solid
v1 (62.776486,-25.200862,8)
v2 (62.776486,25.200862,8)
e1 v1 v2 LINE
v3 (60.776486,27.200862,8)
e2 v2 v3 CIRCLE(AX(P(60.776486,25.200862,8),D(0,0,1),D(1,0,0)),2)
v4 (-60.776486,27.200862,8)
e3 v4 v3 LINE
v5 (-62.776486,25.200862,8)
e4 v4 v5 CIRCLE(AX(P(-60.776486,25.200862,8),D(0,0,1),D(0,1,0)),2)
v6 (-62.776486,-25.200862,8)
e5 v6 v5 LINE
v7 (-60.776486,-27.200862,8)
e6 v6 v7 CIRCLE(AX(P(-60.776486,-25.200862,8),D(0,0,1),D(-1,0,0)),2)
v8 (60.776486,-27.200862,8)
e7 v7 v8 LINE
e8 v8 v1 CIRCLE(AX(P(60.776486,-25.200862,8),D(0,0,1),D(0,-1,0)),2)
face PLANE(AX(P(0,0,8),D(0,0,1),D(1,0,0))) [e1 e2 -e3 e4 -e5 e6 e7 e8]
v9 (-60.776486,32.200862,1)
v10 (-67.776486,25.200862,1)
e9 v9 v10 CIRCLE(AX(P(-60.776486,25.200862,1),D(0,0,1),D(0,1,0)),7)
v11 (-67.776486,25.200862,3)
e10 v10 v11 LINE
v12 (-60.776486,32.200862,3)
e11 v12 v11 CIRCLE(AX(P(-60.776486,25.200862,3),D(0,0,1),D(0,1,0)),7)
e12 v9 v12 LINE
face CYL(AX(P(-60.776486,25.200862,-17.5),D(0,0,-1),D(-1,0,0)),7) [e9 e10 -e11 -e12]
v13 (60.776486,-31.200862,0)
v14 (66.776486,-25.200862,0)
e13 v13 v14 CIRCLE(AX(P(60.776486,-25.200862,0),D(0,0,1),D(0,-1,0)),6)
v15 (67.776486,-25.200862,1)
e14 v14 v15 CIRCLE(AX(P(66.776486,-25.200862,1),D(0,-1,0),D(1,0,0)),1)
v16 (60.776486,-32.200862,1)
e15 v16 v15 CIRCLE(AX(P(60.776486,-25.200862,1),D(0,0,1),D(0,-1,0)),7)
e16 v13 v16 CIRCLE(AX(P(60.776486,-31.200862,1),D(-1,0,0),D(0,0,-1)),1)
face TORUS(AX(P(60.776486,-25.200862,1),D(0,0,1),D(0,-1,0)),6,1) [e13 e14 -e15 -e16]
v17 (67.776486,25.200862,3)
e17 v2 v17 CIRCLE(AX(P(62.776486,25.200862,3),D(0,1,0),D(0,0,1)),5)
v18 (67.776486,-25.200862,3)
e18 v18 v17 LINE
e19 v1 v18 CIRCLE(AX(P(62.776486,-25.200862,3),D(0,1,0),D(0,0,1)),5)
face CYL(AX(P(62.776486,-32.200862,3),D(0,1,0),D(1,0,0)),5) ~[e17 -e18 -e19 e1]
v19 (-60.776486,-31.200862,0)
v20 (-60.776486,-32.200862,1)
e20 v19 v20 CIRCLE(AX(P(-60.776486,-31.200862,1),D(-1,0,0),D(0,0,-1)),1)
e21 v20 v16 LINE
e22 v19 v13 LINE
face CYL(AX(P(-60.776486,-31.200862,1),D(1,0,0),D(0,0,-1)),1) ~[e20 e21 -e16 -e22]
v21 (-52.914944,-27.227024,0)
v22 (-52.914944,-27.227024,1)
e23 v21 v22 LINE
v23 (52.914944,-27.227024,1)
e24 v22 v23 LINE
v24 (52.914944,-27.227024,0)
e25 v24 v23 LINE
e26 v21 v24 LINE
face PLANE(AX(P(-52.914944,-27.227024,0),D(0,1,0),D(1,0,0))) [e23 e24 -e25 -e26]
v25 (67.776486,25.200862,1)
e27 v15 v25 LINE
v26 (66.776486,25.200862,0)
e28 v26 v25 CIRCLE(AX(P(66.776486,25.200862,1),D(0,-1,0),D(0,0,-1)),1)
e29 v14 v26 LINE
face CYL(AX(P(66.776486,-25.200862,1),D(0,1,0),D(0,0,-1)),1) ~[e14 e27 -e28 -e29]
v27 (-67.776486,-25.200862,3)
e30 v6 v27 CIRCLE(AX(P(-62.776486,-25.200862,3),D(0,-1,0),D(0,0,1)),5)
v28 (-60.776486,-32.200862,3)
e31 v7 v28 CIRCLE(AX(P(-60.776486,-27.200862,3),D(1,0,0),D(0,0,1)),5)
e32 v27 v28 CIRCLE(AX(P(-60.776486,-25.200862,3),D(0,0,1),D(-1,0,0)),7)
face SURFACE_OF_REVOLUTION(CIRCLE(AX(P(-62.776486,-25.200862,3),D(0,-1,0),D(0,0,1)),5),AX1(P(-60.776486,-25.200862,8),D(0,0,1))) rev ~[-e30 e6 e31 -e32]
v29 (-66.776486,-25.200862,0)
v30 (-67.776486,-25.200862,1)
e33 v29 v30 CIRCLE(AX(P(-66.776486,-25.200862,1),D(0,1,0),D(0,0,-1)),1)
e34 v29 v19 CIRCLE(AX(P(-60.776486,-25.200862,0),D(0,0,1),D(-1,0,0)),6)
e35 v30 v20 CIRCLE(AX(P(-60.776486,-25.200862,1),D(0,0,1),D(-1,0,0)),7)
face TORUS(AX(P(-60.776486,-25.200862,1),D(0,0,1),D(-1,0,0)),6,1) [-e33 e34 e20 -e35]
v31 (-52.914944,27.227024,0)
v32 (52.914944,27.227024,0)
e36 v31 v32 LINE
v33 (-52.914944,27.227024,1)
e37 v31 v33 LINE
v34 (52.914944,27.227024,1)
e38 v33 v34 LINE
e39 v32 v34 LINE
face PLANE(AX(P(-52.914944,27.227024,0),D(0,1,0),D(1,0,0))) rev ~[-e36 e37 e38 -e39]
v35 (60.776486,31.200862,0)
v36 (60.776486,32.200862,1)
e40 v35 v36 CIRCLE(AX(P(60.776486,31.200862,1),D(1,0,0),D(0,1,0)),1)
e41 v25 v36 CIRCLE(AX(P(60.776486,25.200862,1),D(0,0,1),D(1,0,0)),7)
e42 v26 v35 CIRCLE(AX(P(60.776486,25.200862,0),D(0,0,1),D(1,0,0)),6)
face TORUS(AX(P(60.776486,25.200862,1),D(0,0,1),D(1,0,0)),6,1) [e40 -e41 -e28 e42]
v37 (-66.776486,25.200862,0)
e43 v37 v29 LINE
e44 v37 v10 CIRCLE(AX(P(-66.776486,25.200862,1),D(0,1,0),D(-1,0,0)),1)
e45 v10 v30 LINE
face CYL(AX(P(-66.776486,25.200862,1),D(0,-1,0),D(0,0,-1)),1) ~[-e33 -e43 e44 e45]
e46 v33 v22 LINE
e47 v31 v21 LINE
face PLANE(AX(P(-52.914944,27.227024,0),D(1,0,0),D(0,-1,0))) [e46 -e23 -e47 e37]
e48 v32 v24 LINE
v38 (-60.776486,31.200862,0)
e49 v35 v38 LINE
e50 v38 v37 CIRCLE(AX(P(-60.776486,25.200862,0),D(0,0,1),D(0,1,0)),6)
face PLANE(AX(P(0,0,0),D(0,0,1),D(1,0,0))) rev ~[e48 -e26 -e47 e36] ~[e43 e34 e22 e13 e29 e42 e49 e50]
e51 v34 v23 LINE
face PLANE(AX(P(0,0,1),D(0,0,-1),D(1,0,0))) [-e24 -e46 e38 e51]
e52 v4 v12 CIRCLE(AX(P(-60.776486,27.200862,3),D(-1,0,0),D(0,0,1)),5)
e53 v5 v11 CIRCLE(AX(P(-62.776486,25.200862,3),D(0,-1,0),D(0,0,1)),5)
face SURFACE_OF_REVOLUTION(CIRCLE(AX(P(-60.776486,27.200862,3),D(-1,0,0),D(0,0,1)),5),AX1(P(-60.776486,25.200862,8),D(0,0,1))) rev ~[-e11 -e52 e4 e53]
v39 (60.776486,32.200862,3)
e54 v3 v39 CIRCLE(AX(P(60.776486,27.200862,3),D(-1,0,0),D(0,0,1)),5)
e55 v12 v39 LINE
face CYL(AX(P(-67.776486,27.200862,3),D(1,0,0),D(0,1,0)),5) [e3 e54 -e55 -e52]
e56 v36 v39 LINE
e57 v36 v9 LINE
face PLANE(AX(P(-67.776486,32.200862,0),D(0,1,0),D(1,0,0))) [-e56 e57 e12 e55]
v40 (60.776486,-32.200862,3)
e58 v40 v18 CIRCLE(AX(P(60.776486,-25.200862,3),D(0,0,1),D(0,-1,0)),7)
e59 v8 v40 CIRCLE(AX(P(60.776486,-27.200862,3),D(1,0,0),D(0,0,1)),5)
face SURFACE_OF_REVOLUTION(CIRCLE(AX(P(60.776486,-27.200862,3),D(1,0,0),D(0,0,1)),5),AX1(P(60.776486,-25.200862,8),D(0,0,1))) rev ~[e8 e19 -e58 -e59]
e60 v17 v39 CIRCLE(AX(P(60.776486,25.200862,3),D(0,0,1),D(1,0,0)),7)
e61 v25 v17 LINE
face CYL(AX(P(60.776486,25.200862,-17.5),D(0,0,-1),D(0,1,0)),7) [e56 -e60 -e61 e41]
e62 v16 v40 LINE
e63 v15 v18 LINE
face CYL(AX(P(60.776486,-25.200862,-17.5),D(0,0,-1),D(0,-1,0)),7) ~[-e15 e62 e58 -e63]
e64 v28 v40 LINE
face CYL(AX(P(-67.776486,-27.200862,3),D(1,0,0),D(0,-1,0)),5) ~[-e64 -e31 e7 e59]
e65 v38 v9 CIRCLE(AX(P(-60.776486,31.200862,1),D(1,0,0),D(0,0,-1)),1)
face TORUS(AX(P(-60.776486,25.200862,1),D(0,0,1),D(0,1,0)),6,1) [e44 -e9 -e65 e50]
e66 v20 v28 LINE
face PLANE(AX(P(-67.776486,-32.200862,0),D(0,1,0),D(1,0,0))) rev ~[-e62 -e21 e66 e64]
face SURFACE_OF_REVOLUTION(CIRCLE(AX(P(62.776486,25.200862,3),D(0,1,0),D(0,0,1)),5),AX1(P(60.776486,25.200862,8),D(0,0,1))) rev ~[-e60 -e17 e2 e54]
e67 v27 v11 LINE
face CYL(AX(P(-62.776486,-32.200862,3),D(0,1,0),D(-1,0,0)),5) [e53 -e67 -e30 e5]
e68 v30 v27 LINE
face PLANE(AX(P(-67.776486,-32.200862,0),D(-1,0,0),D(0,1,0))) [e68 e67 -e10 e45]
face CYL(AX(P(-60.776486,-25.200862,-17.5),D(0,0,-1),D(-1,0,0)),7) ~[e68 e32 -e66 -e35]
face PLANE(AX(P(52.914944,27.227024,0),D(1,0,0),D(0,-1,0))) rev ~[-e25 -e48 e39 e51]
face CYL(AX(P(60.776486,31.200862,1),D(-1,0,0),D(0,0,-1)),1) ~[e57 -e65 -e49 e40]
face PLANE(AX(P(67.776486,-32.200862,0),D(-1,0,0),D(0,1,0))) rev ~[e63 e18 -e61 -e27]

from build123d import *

# Parameters (mm, degrees)
F0_W         = 135.5529725552
F0_H         = 64.4017234445
F1_DEPTH     = 8
F2_R         = 5
F3_T1_DEPTH  = 25.5
F3_T4_ANGLE  = 90
F3_T6_ANGLE  = 90
F3_T8_ANGLE  = 90
F3_T10_ANGLE = 90
F4_R         = 1
F5_W         = 105.8298870921
F5_H         = 54.4540472329
F6_DEPTH     = 1


# Not quite as in the source:
# - a fillet or chamfer that OpenCascade refuses, or shapes differently, is made with other operations: its cross-section is extruded or revolved along the edge and cut away or added


with BuildPart() as f1:
    # F0 (on Top) → F1 (new body)
    with BuildSketch(Plane.XY):
        Rectangle(F0_W, F0_H)
    extrude(amount=F1_DEPTH)

    # F2
    f2_edges = [f1.edges().sort_by_distance(p)[0] for p in [
        (0, 32.200862, 8),
        (-67.776486, 0, 8),
        (0, -32.200862, 8),
        (67.776486, 0, 8),
    ]]
    fillet(f2_edges, radius=F2_R)

    # F3: fillet of radius 7 on 4 edges, made by hand

    # F3_s2 → F3_t1 (cut)
    with BuildSketch(Plane.XY.offset(-17.5)):
        with BuildLine():
            ThreePointArc((-67.7764862776, -25.2008617222), (-65.7262337459, -30.1506091905), (-60.7764862776, -32.2008617222))
            Line((-60.7764862776, -32.2008617222), (-67.7764862776, -32.2008617222))
            Line((-67.7764862776, -32.2008617222), (-67.7764862776, -25.2008617222))
        make_face()
        with BuildLine():
            ThreePointArc((60.7764862776, -32.2008617222), (65.7262337459, -30.1506091905), (67.7764862776, -25.2008617222))
            Line((67.7764862776, -25.2008617222), (67.7764862776, -32.2008617222))
            Line((67.7764862776, -32.2008617222), (60.7764862776, -32.2008617222))
        make_face()
        with BuildLine():
            ThreePointArc((60.7764862776, 32.2008617222), (65.7262337459, 30.1506091905), (67.7764862776, 25.2008617222))
            Line((67.7764862776, 25.2008617222), (67.7764862776, 32.2008617222))
            Line((67.7764862776, 32.2008617222), (60.7764862776, 32.2008617222))
        make_face()
        with BuildLine():
            ThreePointArc((-67.7764862776, 25.2008617222), (-65.7262337459, 30.1506091905), (-60.7764862776, 32.2008617222))
            Line((-60.7764862776, 32.2008617222), (-67.7764862776, 32.2008617222))
            Line((-67.7764862776, 32.2008617222), (-67.7764862776, 25.2008617222))
        make_face()
    extrude(amount=F3_T1_DEPTH, mode=Mode.SUBTRACT)

    # F3_s3 → F3_t4 (revolve, cut)
    with BuildSketch(Plane.YZ.offset(-60.7764862776)):
        with BuildLine():
            ThreePointArc((27.2008617222, 8), (30.7363956282, 6.5355339059), (32.2008617222, 3))
            Line((32.2008617222, 3), (32.2008617222, 8))
            Line((32.2008617222, 8), (27.2008617222, 8))
        make_face()
    revolve(axis=Axis((-60.7764862776, 25.2008617222, 8), (0, 0, 1)), revolution_arc=F3_T4_ANGLE, mode=Mode.SUBTRACT)

    # F3_s5 → F3_t6 (revolve, cut)
    with BuildSketch(Plane.XZ.offset(-25.2008617222)):
        with BuildLine():
            ThreePointArc((62.7764862776, 8), (66.3120201835, 6.5355339059), (67.7764862776, 3))
            Line((67.7764862776, 3), (67.7764862776, 8))
            Line((67.7764862776, 8), (62.7764862776, 8))
        make_face()
    revolve(axis=Axis((60.7764862776, 25.2008617222, 8), (0, 0, 1)), revolution_arc=F3_T6_ANGLE, mode=Mode.SUBTRACT)

    # F3_s7 → F3_t8 (revolve, cut)
    with BuildSketch(Plane.YZ.offset(60.7764862776)):
        with BuildLine():
            ThreePointArc((-27.2008617222, 8), (-30.7363956282, 6.5355339059), (-32.2008617222, 3))
            Line((-32.2008617222, 3), (-32.2008617222, 8))
            Line((-32.2008617222, 8), (-27.2008617222, 8))
        make_face()
    revolve(axis=Axis((60.7764862776, -25.2008617222, 8), (0, 0, 1)), revolution_arc=F3_T8_ANGLE, mode=Mode.SUBTRACT)

    # F3_s9 → F3_t10 (revolve, cut)
    with BuildSketch(Plane.XZ.offset(25.2008617222)):
        with BuildLine():
            ThreePointArc((-62.7764862776, 8), (-66.3120201835, 6.5355339059), (-67.7764862776, 3))
            Line((-67.7764862776, 3), (-67.7764862776, 8))
            Line((-67.7764862776, 8), (-62.7764862776, 8))
        make_face()
    revolve(axis=Axis((-60.7764862776, -25.2008617222, 8), (0, 0, 1)), revolution_arc=F3_T10_ANGLE, mode=Mode.SUBTRACT)

    # F4
    f4_edges = [f1.edges().sort_by_distance(p)[0] for p in [
        (0, -32.200862, 0),
        (-67.776486, 0, 0),
    ]]
    fillet(f4_edges, radius=F4_R)

    # F5 (on face) → F6 (cut)
    with BuildSketch(Plane(origin=(0, 0, 0), x_dir=(1, 0, 0), z_dir=(0, 0, -1))):
        Rectangle(F5_W, F5_H)
    extrude(amount=-F6_DEPTH, mode=Mode.SUBTRACT)


solid = f1.part
